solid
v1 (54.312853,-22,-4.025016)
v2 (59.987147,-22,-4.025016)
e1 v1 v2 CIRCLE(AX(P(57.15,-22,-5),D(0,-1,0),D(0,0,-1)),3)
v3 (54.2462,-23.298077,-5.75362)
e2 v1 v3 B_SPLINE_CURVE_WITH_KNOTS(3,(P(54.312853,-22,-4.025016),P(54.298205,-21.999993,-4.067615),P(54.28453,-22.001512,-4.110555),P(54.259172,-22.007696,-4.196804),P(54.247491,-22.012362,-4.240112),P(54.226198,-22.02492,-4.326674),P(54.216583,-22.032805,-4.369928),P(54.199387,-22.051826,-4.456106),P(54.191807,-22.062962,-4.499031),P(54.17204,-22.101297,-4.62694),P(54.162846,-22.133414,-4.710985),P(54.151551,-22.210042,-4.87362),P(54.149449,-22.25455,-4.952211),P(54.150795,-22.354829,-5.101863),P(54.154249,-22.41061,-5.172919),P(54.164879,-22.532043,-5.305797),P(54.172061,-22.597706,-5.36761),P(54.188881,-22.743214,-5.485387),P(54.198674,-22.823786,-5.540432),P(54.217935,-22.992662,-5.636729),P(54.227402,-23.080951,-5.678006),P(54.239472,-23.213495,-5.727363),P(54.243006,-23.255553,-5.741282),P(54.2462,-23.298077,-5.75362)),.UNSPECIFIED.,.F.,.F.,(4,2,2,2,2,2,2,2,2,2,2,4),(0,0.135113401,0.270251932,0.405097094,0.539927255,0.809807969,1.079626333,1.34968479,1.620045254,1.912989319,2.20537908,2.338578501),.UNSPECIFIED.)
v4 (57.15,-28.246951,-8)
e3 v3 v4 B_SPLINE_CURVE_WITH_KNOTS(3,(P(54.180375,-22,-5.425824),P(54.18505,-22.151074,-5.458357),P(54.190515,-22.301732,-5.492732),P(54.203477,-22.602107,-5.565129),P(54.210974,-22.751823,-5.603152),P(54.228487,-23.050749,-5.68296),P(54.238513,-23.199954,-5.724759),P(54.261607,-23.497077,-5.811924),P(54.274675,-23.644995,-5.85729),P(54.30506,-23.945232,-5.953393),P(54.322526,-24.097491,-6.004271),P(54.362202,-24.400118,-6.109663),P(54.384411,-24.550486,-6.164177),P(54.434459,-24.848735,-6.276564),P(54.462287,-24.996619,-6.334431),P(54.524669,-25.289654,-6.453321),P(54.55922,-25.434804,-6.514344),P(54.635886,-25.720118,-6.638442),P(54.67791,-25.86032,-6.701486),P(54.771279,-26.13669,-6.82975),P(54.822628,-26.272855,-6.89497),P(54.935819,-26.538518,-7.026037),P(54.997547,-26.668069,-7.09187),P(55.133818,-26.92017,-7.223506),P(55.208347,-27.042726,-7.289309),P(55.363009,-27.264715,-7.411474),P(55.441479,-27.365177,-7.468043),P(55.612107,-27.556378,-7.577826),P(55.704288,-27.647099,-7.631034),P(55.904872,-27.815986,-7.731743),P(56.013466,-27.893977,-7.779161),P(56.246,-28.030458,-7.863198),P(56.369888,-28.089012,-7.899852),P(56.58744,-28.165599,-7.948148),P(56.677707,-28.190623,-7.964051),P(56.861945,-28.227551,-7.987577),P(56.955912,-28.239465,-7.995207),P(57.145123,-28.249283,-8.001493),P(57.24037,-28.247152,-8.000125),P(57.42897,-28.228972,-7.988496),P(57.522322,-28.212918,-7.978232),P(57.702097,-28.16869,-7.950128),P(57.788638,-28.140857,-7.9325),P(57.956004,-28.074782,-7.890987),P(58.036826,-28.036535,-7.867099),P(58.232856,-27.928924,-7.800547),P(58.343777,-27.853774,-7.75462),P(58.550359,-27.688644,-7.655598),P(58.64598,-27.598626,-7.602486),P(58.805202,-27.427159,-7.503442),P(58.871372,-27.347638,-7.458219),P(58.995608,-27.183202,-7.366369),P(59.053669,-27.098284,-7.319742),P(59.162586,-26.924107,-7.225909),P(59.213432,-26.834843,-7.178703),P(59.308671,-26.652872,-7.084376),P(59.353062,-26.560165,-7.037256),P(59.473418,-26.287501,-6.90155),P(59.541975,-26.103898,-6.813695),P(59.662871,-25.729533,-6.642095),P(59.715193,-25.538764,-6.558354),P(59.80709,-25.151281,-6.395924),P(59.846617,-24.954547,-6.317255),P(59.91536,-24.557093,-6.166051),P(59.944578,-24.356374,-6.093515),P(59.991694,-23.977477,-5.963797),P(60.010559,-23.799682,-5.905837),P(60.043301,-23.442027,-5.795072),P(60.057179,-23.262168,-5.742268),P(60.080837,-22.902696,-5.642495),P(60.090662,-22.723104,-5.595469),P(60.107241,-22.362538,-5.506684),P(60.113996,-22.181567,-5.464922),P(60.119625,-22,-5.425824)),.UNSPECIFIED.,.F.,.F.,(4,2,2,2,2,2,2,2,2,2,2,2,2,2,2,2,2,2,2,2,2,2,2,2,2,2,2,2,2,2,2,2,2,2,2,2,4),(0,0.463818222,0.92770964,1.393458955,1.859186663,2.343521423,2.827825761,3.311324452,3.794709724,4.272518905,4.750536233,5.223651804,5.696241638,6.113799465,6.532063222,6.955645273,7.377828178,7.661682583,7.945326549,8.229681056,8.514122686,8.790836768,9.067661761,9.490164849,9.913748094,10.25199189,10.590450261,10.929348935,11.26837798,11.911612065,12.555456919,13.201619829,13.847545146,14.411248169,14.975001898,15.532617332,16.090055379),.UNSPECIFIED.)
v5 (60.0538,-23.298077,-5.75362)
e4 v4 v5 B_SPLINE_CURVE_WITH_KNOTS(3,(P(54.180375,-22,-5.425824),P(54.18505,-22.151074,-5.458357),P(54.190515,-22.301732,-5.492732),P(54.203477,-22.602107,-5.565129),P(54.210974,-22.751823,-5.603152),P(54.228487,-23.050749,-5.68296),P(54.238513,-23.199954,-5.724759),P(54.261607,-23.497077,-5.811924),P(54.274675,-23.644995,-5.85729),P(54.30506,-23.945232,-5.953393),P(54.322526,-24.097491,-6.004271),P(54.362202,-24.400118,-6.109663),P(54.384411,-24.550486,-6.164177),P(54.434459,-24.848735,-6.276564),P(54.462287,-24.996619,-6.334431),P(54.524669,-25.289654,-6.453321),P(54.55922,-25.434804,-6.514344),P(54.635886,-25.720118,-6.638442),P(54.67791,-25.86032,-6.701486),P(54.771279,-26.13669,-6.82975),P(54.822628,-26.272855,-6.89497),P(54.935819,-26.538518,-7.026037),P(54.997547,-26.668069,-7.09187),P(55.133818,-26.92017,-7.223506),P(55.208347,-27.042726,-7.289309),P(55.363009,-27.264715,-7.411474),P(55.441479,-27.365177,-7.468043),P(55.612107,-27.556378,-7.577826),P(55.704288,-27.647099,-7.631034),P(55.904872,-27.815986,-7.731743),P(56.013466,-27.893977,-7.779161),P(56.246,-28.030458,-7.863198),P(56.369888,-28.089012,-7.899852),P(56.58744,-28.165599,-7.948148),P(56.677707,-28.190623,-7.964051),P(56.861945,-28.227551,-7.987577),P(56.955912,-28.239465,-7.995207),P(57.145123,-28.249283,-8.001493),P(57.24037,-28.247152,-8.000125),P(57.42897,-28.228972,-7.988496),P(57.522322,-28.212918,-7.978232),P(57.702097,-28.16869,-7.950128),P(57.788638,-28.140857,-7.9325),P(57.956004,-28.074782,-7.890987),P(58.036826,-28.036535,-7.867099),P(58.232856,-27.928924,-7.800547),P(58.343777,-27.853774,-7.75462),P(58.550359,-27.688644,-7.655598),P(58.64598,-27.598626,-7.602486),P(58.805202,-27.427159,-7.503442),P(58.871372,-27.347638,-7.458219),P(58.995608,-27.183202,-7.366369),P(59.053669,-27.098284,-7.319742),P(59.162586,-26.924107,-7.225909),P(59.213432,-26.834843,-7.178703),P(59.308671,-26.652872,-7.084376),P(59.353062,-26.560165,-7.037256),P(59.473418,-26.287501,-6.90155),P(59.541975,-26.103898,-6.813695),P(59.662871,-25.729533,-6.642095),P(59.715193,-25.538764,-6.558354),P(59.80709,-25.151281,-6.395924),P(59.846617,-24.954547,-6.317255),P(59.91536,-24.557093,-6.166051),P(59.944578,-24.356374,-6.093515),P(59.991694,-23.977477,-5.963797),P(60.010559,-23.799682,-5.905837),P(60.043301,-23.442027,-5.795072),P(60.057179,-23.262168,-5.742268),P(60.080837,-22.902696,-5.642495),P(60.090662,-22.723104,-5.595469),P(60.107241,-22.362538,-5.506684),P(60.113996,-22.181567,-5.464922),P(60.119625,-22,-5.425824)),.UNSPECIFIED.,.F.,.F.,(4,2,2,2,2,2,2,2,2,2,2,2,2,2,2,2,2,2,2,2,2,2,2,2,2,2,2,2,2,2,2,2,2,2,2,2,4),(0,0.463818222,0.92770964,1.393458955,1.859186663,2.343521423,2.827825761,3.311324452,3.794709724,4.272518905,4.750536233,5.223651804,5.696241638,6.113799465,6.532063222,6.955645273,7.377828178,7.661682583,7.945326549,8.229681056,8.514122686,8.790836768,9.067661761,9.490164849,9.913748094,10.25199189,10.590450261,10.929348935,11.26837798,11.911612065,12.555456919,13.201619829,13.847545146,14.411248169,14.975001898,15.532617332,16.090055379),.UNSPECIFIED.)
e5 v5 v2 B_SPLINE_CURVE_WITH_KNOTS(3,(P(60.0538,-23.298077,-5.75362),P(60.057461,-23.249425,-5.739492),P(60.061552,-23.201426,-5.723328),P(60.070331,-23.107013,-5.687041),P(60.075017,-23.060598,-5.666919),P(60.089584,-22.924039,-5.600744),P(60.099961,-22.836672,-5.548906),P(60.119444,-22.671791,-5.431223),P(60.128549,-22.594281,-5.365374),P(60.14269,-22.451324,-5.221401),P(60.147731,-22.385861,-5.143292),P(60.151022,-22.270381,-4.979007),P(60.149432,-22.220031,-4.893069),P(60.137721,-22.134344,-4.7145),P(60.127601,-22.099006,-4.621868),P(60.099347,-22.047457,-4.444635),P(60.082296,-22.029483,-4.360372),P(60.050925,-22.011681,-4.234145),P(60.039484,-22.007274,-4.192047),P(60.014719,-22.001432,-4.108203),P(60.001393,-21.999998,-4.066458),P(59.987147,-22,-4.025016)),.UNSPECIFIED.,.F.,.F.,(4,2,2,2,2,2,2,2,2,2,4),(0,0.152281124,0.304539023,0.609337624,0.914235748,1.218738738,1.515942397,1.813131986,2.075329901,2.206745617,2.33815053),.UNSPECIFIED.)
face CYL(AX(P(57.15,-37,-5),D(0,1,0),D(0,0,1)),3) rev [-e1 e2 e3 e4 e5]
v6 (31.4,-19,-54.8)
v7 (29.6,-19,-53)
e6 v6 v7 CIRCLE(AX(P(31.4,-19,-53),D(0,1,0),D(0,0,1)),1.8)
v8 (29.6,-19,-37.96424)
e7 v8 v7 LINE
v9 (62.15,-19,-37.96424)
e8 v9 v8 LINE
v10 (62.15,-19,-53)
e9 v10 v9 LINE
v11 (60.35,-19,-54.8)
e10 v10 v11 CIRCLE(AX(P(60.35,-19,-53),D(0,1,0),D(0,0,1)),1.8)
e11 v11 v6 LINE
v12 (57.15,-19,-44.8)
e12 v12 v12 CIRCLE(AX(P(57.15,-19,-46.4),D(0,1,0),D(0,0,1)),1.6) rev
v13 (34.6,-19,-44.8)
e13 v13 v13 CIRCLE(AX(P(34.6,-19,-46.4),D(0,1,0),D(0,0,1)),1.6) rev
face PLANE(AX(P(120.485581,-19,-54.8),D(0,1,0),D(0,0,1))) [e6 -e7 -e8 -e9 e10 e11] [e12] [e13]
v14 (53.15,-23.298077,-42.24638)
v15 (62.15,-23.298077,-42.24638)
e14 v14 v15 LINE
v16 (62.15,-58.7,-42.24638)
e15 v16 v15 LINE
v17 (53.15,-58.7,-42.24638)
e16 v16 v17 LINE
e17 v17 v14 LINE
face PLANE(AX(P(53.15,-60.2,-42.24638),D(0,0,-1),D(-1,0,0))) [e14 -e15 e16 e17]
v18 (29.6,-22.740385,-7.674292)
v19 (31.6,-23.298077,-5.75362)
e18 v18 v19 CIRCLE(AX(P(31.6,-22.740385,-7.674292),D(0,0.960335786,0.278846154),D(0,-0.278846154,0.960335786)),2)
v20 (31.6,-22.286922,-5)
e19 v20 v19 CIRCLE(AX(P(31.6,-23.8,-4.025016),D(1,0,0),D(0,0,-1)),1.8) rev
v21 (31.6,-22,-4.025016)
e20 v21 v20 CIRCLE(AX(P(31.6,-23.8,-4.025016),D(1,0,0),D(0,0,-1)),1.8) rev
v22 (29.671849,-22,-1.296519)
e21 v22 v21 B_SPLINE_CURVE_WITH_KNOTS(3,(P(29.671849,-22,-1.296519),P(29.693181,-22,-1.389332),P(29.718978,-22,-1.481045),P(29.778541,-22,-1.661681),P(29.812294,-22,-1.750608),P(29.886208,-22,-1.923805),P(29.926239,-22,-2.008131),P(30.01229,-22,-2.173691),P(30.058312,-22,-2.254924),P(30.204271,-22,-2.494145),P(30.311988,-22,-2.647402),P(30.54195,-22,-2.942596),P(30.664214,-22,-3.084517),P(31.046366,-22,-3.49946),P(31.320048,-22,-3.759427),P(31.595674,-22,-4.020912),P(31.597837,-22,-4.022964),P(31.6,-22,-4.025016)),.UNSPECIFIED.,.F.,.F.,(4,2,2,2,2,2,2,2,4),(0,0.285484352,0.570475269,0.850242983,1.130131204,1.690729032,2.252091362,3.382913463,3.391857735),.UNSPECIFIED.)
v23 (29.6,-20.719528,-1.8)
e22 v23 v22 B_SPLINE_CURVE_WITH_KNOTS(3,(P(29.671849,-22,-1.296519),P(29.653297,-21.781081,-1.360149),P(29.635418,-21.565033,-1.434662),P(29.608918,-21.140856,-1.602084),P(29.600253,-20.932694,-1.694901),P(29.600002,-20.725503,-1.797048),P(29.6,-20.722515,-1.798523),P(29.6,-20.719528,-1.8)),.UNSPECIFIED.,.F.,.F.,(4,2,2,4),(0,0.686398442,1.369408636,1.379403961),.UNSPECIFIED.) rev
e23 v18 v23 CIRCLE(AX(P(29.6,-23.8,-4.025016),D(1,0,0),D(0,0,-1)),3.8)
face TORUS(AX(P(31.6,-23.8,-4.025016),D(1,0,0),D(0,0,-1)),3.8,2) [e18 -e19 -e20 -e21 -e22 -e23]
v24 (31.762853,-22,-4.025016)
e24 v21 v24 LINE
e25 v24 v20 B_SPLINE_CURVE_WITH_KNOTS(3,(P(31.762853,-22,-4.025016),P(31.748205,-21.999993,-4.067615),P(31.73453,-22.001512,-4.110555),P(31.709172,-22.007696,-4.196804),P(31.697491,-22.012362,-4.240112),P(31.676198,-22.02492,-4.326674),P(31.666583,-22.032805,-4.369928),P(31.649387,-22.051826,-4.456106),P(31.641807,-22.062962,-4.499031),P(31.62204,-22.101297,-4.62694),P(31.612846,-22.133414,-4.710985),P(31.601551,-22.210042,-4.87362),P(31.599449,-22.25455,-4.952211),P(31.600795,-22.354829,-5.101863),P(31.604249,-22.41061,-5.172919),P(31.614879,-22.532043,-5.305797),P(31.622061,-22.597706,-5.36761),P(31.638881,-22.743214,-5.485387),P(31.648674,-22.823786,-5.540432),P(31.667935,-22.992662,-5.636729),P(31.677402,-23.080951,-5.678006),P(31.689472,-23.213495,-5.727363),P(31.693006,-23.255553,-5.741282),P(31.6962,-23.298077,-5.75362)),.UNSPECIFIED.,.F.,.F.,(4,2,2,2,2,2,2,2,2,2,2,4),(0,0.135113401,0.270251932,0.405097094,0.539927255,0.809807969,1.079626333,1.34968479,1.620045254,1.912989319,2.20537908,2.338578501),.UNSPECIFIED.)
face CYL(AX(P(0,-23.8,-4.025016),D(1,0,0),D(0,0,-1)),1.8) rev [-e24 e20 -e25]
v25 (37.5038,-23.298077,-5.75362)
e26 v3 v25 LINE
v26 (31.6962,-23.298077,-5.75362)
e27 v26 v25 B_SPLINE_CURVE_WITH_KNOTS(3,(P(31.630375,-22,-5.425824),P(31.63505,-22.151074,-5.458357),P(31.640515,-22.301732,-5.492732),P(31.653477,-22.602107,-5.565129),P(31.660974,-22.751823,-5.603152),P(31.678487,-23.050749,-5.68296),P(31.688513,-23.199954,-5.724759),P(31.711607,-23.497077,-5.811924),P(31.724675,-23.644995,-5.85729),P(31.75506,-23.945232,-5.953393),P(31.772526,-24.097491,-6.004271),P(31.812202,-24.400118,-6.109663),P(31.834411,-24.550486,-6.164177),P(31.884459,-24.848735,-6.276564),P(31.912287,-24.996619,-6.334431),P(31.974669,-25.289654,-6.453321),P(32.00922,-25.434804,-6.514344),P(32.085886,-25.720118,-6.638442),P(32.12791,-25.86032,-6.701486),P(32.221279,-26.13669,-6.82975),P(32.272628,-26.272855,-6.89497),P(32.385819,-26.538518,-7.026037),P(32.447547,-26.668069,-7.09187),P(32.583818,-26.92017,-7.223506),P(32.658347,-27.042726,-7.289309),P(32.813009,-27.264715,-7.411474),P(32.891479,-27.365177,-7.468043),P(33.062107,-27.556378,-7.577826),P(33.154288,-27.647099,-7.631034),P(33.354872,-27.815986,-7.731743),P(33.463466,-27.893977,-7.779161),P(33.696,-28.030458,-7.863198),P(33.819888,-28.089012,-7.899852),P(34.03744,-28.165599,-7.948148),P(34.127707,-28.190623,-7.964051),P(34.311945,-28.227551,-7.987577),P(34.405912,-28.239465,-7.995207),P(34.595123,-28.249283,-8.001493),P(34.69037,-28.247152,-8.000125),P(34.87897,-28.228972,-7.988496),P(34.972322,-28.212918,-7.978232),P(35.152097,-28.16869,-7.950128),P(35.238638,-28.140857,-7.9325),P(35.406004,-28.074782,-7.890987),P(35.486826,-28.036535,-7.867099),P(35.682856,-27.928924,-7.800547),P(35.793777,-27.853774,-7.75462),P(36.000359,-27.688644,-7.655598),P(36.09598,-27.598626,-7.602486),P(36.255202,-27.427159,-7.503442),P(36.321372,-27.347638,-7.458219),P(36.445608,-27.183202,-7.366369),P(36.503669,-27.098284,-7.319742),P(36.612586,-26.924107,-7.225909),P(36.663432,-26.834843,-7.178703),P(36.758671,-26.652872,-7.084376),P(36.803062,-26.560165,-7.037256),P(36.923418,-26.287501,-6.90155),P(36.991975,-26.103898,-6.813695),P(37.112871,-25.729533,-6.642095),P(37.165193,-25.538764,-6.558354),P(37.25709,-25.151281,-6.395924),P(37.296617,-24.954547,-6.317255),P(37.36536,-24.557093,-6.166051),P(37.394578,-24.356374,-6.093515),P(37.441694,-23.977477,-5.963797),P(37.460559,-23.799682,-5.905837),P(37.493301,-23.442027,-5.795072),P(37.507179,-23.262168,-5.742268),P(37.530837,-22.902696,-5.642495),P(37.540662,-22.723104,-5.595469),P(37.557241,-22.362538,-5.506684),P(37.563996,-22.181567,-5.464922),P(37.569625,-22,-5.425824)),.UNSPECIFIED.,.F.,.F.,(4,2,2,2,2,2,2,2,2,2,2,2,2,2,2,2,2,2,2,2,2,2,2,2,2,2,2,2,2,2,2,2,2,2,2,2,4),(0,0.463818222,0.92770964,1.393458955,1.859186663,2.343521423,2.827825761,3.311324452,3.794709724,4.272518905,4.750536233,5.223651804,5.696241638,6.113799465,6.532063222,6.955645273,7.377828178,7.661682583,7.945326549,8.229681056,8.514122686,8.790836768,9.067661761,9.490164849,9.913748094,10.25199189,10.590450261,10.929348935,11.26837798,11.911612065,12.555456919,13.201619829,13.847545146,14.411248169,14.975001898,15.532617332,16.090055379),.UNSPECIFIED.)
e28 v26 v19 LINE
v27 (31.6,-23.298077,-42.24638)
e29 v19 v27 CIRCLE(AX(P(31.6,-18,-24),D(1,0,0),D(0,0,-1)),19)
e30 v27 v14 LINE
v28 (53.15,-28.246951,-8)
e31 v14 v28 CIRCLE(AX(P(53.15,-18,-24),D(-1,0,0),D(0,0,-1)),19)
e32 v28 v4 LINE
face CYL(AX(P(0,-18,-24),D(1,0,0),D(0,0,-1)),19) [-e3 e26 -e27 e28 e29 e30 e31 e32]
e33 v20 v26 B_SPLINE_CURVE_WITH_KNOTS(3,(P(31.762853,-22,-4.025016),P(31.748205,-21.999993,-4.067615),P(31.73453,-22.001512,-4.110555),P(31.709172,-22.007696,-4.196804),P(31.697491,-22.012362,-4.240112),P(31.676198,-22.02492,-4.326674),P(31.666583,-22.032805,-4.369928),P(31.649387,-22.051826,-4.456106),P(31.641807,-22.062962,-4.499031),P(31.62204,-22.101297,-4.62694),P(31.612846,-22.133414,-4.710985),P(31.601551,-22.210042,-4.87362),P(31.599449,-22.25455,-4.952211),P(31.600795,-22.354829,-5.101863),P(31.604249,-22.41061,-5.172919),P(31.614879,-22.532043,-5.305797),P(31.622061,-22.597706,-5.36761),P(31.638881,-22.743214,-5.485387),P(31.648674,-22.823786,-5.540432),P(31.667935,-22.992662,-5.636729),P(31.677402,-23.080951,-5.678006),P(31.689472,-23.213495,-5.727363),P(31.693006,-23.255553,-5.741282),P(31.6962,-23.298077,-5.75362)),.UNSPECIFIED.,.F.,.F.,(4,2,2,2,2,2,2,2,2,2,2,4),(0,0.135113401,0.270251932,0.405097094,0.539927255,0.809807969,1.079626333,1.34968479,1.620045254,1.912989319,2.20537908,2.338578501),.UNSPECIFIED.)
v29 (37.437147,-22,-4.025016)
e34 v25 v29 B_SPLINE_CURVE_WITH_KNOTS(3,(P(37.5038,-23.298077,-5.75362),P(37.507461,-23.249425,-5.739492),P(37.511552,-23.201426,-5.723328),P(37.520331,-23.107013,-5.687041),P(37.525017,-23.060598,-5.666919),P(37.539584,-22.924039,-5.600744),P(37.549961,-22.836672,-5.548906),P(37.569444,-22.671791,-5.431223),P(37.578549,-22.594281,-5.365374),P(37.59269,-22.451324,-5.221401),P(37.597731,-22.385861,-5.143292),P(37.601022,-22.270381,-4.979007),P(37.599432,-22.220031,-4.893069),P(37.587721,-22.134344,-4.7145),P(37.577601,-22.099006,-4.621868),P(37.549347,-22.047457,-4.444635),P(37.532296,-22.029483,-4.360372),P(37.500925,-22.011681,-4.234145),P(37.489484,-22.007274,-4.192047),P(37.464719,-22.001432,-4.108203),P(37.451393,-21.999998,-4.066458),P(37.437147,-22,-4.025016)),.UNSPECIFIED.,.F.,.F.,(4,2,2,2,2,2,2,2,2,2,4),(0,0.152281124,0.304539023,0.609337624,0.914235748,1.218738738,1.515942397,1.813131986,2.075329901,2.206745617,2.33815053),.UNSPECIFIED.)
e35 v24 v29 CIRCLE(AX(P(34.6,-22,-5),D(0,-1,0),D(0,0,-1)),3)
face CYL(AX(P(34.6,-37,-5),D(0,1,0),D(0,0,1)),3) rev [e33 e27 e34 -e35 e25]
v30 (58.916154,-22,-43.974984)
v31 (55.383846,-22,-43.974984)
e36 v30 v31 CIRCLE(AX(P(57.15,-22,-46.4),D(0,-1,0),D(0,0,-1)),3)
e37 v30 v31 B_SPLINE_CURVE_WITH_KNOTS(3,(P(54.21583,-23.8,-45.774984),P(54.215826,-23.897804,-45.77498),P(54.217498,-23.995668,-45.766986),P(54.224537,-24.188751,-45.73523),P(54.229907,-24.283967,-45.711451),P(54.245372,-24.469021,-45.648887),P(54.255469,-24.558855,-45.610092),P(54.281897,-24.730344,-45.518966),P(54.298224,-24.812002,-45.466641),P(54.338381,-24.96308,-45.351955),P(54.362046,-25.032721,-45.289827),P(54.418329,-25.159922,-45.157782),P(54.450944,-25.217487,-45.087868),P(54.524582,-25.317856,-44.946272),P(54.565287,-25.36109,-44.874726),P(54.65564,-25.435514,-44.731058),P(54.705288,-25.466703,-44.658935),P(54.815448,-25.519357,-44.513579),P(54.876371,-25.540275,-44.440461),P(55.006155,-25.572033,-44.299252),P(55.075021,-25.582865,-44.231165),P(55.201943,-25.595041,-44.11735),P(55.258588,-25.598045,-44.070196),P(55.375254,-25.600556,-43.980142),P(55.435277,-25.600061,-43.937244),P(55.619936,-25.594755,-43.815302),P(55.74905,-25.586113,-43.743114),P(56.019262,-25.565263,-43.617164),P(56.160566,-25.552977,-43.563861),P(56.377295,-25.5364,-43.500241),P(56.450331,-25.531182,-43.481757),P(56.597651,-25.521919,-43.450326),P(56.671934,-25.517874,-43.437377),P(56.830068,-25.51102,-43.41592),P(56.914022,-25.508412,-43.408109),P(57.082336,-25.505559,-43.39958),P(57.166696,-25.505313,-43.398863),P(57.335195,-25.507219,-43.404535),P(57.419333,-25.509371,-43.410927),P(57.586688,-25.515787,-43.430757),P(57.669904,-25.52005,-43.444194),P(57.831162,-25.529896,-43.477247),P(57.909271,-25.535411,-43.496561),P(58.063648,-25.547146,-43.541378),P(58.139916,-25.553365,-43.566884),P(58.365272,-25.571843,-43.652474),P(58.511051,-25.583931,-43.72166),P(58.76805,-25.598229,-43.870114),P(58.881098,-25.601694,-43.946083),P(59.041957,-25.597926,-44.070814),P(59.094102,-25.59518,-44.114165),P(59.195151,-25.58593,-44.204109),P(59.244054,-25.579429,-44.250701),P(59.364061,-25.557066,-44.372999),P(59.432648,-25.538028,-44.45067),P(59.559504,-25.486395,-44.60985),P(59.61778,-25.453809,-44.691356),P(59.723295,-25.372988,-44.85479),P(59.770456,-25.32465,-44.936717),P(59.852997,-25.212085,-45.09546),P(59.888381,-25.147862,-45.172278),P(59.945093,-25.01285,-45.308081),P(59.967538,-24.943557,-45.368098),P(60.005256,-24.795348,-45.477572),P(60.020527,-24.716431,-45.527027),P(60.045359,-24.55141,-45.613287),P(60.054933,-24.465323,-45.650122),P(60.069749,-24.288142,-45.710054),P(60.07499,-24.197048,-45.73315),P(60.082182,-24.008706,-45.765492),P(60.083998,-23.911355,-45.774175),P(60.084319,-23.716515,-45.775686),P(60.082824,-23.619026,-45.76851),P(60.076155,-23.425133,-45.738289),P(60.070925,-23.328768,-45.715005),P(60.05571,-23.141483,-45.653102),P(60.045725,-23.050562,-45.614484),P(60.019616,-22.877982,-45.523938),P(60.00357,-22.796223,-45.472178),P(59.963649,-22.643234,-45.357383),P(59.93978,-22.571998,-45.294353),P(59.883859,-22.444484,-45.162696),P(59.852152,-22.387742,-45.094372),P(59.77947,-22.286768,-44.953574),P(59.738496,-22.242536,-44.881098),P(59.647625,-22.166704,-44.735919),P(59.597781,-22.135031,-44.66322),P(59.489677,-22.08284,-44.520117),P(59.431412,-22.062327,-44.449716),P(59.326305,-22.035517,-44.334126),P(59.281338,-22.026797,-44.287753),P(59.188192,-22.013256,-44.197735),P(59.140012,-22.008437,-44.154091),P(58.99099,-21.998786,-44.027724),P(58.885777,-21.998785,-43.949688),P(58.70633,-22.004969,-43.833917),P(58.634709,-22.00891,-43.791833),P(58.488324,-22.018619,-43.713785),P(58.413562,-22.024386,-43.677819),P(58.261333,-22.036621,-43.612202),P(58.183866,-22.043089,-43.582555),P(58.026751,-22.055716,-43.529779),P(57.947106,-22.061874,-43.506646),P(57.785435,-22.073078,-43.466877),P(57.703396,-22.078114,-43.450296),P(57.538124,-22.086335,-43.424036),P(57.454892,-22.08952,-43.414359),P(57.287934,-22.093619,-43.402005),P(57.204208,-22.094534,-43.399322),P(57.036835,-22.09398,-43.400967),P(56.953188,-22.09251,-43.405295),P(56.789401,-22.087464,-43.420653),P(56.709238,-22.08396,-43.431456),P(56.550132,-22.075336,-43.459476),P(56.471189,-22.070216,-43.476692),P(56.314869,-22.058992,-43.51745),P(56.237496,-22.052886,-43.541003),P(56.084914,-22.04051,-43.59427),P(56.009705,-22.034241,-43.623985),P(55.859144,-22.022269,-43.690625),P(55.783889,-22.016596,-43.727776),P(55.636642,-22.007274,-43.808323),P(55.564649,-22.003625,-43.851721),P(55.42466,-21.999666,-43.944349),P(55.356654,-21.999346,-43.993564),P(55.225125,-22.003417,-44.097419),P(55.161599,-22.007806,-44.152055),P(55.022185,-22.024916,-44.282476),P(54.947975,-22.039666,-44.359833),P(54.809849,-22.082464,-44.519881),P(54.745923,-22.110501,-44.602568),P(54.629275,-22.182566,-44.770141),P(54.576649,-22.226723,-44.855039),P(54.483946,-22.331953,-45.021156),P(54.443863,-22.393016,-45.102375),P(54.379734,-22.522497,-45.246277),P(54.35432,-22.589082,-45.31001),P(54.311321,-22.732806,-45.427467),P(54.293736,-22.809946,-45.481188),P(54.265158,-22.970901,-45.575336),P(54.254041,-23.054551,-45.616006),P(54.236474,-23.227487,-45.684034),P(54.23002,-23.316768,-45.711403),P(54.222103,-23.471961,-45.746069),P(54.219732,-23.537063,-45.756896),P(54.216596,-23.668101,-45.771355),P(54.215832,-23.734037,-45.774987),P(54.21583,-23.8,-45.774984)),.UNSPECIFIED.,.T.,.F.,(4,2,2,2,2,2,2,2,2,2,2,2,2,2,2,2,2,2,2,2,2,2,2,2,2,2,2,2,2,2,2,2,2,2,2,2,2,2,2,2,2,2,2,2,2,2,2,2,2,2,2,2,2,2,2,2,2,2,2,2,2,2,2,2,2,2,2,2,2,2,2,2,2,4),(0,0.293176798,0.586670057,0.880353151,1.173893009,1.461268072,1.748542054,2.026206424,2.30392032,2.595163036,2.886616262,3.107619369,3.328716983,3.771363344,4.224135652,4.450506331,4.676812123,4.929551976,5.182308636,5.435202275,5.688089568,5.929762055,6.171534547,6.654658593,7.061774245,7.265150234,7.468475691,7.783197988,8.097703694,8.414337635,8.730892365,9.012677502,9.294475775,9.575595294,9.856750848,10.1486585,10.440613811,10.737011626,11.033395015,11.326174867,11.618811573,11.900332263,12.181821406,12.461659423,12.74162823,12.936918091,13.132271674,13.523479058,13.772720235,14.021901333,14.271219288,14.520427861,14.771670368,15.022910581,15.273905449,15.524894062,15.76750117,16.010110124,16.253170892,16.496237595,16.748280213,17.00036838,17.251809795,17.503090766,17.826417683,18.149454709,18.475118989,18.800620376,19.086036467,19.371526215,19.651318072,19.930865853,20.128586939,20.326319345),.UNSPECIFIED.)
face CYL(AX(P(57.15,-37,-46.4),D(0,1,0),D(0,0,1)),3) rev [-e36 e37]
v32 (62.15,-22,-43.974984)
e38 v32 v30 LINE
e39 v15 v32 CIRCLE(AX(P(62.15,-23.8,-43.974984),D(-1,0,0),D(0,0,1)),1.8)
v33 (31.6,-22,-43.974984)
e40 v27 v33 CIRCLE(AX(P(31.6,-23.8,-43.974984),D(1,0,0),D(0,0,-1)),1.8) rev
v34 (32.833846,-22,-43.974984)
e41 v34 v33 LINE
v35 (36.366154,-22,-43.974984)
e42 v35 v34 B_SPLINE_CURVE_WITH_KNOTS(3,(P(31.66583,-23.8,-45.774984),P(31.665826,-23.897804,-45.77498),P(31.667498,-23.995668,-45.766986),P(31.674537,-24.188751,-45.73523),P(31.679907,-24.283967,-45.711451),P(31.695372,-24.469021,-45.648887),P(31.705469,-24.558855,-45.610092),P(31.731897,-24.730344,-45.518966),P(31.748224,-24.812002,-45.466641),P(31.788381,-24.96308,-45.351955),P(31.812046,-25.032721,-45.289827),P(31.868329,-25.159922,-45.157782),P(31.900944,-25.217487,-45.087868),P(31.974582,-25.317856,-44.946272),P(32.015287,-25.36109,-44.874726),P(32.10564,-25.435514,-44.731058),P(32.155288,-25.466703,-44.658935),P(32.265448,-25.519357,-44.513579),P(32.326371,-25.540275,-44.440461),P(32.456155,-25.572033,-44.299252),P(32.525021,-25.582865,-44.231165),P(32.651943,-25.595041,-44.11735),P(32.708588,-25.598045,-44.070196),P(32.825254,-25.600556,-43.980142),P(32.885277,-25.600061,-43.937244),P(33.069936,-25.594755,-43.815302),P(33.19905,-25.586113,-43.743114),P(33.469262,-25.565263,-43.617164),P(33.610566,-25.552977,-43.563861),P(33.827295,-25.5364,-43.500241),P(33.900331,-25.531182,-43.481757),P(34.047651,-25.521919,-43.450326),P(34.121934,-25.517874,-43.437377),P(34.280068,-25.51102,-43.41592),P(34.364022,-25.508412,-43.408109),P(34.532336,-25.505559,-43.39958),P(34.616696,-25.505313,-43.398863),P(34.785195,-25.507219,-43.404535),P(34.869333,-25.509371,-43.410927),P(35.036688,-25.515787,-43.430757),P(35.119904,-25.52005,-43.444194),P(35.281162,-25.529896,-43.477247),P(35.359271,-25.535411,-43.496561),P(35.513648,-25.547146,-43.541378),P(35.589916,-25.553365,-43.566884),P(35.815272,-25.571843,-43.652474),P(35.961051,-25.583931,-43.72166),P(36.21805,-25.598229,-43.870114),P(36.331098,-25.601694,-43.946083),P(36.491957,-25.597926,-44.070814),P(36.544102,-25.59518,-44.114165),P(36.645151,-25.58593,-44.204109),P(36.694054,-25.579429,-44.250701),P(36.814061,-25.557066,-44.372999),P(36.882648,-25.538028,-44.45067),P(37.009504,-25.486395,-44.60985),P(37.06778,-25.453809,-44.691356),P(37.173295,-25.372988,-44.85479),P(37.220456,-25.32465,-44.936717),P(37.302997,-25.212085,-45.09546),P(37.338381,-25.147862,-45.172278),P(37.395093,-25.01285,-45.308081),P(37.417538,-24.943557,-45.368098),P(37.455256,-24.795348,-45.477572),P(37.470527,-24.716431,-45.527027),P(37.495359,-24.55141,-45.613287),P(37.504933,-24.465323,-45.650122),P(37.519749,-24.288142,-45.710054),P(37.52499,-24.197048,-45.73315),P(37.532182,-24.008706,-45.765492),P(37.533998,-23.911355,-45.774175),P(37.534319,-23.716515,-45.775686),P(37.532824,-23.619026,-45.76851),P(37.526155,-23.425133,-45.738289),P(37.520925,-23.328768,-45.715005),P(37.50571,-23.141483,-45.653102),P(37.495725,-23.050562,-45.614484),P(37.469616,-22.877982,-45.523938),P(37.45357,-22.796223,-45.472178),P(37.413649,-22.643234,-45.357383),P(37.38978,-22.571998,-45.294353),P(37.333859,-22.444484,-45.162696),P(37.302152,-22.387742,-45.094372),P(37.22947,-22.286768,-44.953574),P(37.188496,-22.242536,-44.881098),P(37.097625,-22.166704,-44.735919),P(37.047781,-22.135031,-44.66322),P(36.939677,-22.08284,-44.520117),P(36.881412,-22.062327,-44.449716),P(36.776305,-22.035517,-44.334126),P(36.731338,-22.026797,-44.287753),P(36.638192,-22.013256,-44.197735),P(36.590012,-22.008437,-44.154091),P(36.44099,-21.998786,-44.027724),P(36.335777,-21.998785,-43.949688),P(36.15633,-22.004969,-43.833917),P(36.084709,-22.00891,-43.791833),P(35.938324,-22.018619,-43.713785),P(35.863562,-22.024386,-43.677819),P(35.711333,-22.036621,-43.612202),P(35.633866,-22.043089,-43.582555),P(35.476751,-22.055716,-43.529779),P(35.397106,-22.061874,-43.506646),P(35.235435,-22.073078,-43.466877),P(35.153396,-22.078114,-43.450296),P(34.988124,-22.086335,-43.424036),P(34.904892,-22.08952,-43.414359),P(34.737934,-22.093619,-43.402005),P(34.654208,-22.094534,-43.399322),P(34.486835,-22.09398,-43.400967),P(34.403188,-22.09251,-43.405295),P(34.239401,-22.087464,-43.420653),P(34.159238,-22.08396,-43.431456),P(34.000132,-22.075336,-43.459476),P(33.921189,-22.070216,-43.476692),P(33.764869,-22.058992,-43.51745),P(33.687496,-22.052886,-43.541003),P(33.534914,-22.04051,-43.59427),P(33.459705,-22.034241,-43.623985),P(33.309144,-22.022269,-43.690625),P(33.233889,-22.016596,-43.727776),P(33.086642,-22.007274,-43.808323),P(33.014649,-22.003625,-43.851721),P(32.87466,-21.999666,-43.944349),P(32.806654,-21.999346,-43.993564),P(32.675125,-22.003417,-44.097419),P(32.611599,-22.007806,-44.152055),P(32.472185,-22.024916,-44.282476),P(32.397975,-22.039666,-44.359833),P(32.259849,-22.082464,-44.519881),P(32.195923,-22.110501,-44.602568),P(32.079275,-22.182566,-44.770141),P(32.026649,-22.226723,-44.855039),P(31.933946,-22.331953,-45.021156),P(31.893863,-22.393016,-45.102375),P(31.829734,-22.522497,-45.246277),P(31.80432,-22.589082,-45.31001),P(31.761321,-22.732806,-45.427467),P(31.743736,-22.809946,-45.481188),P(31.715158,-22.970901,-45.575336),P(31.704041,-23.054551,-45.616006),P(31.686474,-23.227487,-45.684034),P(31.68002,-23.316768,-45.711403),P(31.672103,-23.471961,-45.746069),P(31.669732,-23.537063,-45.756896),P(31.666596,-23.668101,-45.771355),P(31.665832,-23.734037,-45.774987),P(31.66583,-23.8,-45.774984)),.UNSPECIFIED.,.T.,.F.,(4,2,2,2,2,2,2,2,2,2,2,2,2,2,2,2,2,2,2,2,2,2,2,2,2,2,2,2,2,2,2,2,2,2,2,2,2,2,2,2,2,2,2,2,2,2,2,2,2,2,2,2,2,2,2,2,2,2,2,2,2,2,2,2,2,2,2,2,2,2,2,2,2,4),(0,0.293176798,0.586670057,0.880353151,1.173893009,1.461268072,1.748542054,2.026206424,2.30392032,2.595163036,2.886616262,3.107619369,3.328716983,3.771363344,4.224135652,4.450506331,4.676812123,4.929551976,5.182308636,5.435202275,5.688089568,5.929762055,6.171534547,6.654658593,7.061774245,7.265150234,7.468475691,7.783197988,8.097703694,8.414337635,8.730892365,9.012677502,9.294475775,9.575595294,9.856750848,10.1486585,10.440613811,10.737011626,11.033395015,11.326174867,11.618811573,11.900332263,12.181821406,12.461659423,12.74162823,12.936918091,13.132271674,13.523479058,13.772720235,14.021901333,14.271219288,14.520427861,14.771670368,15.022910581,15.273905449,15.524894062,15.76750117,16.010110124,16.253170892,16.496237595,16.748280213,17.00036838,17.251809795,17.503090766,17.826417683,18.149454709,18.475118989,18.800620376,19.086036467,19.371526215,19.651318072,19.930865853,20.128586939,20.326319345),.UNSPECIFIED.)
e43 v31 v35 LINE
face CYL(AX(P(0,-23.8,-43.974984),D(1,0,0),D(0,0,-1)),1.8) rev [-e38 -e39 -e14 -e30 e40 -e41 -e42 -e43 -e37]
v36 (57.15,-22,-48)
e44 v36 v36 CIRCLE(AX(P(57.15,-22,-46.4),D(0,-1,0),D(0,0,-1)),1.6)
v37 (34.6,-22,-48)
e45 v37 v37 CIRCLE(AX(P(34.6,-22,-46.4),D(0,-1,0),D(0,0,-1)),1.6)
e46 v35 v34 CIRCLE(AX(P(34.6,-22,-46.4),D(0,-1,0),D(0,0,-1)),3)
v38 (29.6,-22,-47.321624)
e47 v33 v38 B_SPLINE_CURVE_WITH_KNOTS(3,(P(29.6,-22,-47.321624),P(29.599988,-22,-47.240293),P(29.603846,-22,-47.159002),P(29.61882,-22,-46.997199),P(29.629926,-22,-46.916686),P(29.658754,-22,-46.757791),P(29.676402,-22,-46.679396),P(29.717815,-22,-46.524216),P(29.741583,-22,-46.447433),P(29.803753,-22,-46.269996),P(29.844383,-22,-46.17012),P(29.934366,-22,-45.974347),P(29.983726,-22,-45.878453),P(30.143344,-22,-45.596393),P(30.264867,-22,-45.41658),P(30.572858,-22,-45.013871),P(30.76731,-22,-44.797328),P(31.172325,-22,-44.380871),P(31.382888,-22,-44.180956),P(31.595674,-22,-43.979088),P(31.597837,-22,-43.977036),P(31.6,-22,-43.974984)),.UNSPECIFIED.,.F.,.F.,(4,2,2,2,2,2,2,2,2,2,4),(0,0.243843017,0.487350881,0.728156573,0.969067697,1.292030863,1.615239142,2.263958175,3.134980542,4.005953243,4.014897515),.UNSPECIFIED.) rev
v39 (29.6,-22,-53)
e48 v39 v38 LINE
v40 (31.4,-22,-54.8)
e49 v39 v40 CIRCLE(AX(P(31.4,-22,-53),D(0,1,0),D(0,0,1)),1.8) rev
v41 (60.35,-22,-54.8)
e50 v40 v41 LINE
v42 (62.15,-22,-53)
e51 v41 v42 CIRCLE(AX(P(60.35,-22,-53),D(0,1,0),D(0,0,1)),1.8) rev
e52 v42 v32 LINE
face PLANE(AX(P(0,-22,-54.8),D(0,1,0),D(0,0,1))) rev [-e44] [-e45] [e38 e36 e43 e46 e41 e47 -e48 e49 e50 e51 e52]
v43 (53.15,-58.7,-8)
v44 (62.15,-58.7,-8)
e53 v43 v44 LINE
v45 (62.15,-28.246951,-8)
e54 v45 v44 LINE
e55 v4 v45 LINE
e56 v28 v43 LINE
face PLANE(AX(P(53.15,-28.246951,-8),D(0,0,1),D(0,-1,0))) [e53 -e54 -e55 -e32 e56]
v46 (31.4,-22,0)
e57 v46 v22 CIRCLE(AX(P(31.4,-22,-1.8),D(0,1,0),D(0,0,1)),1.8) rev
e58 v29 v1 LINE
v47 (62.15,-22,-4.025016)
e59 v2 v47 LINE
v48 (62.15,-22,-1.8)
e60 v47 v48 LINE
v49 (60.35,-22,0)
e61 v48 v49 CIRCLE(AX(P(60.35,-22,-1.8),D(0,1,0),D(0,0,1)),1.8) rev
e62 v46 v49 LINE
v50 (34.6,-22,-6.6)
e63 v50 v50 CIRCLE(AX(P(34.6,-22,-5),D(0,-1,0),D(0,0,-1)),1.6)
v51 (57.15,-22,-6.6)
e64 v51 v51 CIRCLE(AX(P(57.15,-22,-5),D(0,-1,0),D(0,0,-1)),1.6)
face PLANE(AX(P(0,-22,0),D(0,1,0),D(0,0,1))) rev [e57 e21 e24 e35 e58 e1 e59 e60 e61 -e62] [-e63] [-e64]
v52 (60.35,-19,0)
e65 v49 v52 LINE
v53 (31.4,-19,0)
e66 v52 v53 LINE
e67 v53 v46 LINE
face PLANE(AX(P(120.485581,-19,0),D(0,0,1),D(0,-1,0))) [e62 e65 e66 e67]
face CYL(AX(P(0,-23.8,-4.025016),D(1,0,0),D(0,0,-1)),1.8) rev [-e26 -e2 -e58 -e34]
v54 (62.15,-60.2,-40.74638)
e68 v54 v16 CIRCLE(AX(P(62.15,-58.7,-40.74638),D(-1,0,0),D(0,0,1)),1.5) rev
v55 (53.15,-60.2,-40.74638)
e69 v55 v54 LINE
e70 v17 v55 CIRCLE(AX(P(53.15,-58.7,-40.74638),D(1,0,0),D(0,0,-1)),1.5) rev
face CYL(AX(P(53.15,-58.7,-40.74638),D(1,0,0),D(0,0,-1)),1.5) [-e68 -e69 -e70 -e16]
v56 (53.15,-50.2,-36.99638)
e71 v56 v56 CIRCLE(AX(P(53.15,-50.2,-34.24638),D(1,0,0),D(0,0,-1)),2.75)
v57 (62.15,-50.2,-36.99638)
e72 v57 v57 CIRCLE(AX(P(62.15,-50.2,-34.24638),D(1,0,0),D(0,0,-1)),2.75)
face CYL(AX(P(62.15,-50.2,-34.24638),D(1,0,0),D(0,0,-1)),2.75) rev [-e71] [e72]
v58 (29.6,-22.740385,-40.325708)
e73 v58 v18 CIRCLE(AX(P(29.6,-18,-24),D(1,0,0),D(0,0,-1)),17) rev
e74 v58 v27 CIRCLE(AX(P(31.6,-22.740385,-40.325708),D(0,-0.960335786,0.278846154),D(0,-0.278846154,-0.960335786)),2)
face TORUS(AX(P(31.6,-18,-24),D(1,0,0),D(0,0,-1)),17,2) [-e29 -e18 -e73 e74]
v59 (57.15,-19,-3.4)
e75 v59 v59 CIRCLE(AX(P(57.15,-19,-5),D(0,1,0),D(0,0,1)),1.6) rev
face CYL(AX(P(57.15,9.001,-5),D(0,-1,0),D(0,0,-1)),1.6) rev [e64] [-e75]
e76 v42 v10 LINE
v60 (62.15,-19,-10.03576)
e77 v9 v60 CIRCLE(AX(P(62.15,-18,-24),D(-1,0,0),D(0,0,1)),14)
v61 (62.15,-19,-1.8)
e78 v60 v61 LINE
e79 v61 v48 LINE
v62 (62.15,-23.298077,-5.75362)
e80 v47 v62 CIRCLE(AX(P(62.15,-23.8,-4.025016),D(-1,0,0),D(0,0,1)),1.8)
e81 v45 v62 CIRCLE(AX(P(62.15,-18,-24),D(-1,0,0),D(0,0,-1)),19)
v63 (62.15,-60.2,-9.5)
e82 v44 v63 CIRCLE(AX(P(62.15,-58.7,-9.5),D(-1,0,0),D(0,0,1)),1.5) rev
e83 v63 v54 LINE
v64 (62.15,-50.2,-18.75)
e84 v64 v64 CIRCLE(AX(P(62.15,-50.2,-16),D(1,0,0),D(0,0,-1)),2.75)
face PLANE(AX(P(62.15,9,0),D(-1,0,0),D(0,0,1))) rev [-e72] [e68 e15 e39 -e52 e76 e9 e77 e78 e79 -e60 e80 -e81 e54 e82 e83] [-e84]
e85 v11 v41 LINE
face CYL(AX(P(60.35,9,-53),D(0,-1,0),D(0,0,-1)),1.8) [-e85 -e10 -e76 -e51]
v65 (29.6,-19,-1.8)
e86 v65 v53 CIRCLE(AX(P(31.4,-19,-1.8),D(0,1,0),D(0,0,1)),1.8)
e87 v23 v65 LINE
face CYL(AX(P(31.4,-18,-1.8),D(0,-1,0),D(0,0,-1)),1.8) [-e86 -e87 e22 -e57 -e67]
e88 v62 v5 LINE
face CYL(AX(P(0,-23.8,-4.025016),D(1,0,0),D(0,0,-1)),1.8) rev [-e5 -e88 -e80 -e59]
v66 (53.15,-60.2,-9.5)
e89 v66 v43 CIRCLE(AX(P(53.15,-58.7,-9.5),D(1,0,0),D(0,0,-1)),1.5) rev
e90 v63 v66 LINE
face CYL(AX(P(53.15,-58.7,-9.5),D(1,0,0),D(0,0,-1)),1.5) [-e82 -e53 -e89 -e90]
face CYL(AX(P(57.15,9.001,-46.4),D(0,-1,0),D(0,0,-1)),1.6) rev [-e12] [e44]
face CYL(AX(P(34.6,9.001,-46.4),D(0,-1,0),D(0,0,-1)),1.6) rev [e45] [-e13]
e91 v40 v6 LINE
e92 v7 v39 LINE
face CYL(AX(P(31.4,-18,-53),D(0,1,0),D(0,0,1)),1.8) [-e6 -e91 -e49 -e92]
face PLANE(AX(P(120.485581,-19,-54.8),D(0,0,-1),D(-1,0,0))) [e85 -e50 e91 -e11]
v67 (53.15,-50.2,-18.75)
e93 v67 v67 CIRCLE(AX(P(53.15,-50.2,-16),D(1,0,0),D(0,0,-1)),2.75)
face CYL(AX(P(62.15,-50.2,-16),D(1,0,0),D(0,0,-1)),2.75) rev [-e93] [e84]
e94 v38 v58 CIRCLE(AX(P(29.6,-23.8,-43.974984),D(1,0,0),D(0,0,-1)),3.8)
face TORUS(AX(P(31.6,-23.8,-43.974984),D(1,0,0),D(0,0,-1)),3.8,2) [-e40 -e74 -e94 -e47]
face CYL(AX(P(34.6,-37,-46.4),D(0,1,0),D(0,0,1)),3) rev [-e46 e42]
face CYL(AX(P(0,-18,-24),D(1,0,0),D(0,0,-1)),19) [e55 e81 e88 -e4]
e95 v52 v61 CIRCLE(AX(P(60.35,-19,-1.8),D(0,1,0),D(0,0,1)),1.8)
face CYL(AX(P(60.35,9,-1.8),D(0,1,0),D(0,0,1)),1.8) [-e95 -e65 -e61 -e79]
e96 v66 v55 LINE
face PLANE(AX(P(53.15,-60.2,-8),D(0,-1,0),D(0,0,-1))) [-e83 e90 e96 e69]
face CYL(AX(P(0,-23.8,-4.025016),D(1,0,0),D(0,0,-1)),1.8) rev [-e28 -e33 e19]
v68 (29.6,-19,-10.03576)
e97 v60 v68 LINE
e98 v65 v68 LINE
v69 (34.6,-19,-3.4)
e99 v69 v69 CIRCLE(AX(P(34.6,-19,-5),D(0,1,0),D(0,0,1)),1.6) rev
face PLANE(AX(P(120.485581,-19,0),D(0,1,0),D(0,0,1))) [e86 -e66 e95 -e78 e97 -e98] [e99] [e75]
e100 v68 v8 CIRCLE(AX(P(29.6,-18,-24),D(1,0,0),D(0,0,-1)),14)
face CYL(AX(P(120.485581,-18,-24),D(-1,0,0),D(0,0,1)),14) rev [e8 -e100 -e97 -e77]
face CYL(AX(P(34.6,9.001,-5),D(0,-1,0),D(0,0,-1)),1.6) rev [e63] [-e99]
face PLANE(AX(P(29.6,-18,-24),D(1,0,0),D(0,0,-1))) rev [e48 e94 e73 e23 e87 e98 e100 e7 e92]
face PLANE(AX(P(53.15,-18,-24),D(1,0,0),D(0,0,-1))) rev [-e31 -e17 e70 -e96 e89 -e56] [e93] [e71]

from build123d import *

# Parameters (mm, degrees)
SKETCH1_W                       = 62.15
SKETCH1_H                       = 78
BOSS_EXTRUDE1_DEPTH             = 9
SPRING_PULLEY_CUTOUT_DEPTH      = 10
SPRING_PULLEY_CUTOUT_DEPTH_BACK = 11.2
SKETCH2_R                       = 25
SKETCH3_R                       = 1.225
CUT_EXTRUDE2_DEPTH              = 7.5
SKETCH4_R                       = 0.75
CUT_EXTRUDE3_DEPTH              = 101.014361469
CHAMFER1_SIZE                   = 0.4
CHAMFER1_SIZE2                  = 0.692820323
MOTOR_HOLDER_DEPTH              = 32.95
MOVE_FACE7_BY                   = 0.4
SKETCH20_R                      = 2.55
CUT_EXTRUDE8_DEPTH              = 7
BOSS_EXTRUDE5_DEPTH             = 32.55
MOVE_FACE3_BY                   = 1
CUT_EXTRUDE12_DEPTH             = 108.086985671
FILLET12_R                      = 1.8
SKETCH24_R                      = 1.6
MOTOR_CLIP_HOLES_DEPTH          = 3
SKETCH26_W                      = 5.75
SKETCH26_H                      = 12.7
CUT_EXTRUDE13_DEPTH             = 110.829970864
SKETCH27_R                      = 2
CUT_EXTRUDE14_DEPTH             = 7.25
SKETCH29_R                      = 0.8
CUT_EXTRUDE16_DEPTH             = 5
SKETCH52_W                      = 78
SKETCH52_H                      = 9
CUT_EXTRUDE31_DEPTH             = 7.25
MOVE_START                      = -54.4
MOVE_FACE6_OUTLINE_W            = 5.75
MOVE_FACE6_OUTLINE_H            = 9
MOVE_FACE6_DEPTH                = 13.1
SKETCH31_W                      = 2
SKETCH31_H                      = 4
SKETCH32_R                      = 3
CUT_EXTRUDE17_DEPTH             = 105.439563953
MOTOR_CLIP_WIRE_FILLET_R        = 2
BOSS_EXTRUDE8_DEPTH             = 9
FILLET13_R                      = 1.5
M5_CLEARANCE_HOLE1_D            = 5.5


# Read off the part's stored shape, not the designer's step: Move Face6
with BuildPart() as part:
    # Sketch1 → Boss-Extrude1 (new body)
    with BuildSketch(Plane(origin=(0, 0, 0), x_dir=(1, 0, 0), z_dir=(0, 1, 0))):
        with Locations((31.075, 39)):
            Rectangle(SKETCH1_W, SKETCH1_H)
    extrude(amount=BOSS_EXTRUDE1_DEPTH)

    # Sketch2 → spring_pulley_cutout (cut, two sides: drawn at the far end of the back side and taken through both)
    with BuildSketch(Plane.ZY.offset(-18).offset(-SPRING_PULLEY_CUTOUT_DEPTH_BACK)):
        with Locations((-24, -18)):
            Circle(SKETCH2_R)
    extrude(amount=SPRING_PULLEY_CUTOUT_DEPTH + SPRING_PULLEY_CUTOUT_DEPTH_BACK, mode=Mode.SUBTRACT)

    # Sketch3 → Cut-Extrude2 (cut)
    with BuildSketch(Plane(origin=(0, 9, 0), x_dir=(1, 0, 0), z_dir=(0, 1, 0))):
        with Locations(Location((12.85, 4, 0), (0, 0, 270))):
            Circle(SKETCH3_R)
        with Locations(Location((23.15, 44, 0), (0, 0, 270))):
            Circle(SKETCH3_R)
    extrude(amount=-CUT_EXTRUDE2_DEPTH, mode=Mode.SUBTRACT)

    # Sketch4 → Cut-Extrude3 (cut, through all)
    with BuildSketch(Plane(origin=(0, 1.5, 0), x_dir=(1, 0, 0), z_dir=(0, 1, 0))):
        with Locations(Location((12.85, 4, 0), (0, 0, 270))):
            Circle(SKETCH4_R)
        with Locations(Location((23.15, 44, 0), (0, 0, 270))):
            Circle(SKETCH4_R)
    extrude(amount=-CUT_EXTRUDE3_DEPTH, mode=Mode.SUBTRACT)

    # Chamfer1
    chamfer1_edges = [part.edges().sort_by_distance(p)[0] for p in [
        (12.85, 9, -5.225),
        (23.15, 9, -45.225),
    ]]
    chamfer1_side = [part.faces().sort_by_distance(p)[0] for p in [
        (31.100480241, 9, -39.029231634),
    ]]
    chamfer(chamfer1_edges, length=CHAMFER1_SIZE, length2=CHAMFER1_SIZE2, reference=chamfer1_side[0])

    # Sketch19 → Motor Holder (add)
    with BuildSketch(Plane.ZY.offset(-29.2)):
        with BuildLine():
            Line((-54.8, -18), (-38, -18))
            ThreePointArc((-38, -18), (-24, -4), (-10, -18))
            Line((-10, -18), (0, -18))
            Line((0, -18), (0, 0))
            Line((0, 0), (-54.8, 0))
            Line((-54.8, 0), (-54.8, -18))
        make_face()
    extrude(amount=-MOTOR_HOLDER_DEPTH)

    # Move Face7: a face moved inward by 0.4
    extrude(part.faces().sort_by_distance((29.2, 0.75, -27.4))[0], amount=MOVE_FACE7_BY, dir=(1, 0, 0), mode=Mode.SUBTRACT)

    # Sketch20 → Cut-Extrude8 (cut)
    with BuildSketch(Plane(origin=(0, -18, 0), x_dir=(-1, 0, 0), z_dir=(0, -1, 0))):
        with Locations(Location((-57.15, 5, 0), (0, 0, 90))):
            Circle(SKETCH20_R)
        with Locations(Location((-34.6, 5, 0), (0, 0, 90))):
            Circle(SKETCH20_R)
        with Locations(Location((-57.15, 46.4, 0), (0, 0, 90))):
            Circle(SKETCH20_R)
        with Locations(Location((-34.6, 46.4, 0), (0, 0, 90))):
            Circle(SKETCH20_R)
    extrude(amount=-CUT_EXTRUDE8_DEPTH, mode=Mode.SUBTRACT)

    # Move Face3: a face moved inward by 1.0
    extrude(part.faces().sort_by_distance((8, 2.836578696, -24))[0], amount=MOVE_FACE3_BY, dir=(-1, 0, 0), mode=Mode.SUBTRACT)

    # Sketch26 → Cut-Extrude13 (cut, through all)
    with BuildSketch(Plane(origin=(0, 9, 0), x_dir=(1, 0, 0), z_dir=(0, 1, 0))):
        with Locations((10.125, 47.85)):
            Rectangle(SKETCH26_W, SKETCH26_H)
    extrude(amount=-CUT_EXTRUDE13_DEPTH, mode=Mode.SUBTRACT)

    # Sketch27 → Cut-Extrude14 (cut)
    with BuildSketch(Plane.ZY):
        with Locations((-44.6, 5)):
            Circle(SKETCH27_R)
        with Locations((-51.1, 5)):
            Circle(SKETCH27_R)
    extrude(amount=-CUT_EXTRUDE14_DEPTH, mode=Mode.SUBTRACT)

    # Sketch29 → Cut-Extrude16 (cut)
    with BuildSketch(Plane.ZY.offset(-13)):
        with Locations((-51.1, 5)):
            Circle(SKETCH29_R)
        with Locations((-44.6, 5)):
            Circle(SKETCH29_R)
    extrude(amount=-CUT_EXTRUDE16_DEPTH, mode=Mode.SUBTRACT)

    # Sketch52 → Cut-Extrude31 (cut)
    with BuildSketch(Plane.ZY):
        with Locations((-39, 4.5)):
            Rectangle(SKETCH52_W, SKETCH52_H)
    extrude(amount=-CUT_EXTRUDE31_DEPTH, mode=Mode.SUBTRACT)

    # Move Face6 outline → Move Face6 (cut)
    with BuildSketch(Plane.XY.offset(MOVE_START)):
        with Locations((10.125, 4.5)):
            Rectangle(MOVE_FACE6_OUTLINE_W, MOVE_FACE6_OUTLINE_H)
    extrude(amount=MOVE_FACE6_DEPTH, mode=Mode.SUBTRACT)

    # Cut-Sweep1: sweep along a path in Sketch30
    with BuildLine(Plane(origin=(0, -12, 0), x_dir=(-1, 0, 0), z_dir=(0, -1, 0))) as cut_sweep1_path:
        CenterArc((-45.875, 0), 5, 0, 360)
    # Sketch31 → Cut-Sweep1 (sweep, cut)
    with BuildSketch(Plane(origin=(0, 0, 0), x_dir=(-1, 0, 0), z_dir=(0, 0, -1))):
        with Locations((-42.875, -12)):
            Rectangle(SKETCH31_W, SKETCH31_H)
    sweep(path=cut_sweep1_path.line, mode=Mode.SUBTRACT)


with BuildPart() as body_2:
    # Sketch22 → Boss-Extrude5 (new body)
    with BuildSketch(Plane.ZY.offset(-29.6)):
        with BuildLine():
            Line((0, -19), (-10.035759956, -19))
            ThreePointArc((-10.035759956, -19), (-24, -32), (-37.964240044, -19))
            Line((-37.964240044, -19), (-54.8, -19))
            Line((-54.8, -19), (-54.8, -39))
            Line((-54.8, -39), (0, -39))
            Line((0, -39), (0, -19))
        make_face()
    extrude(amount=-BOSS_EXTRUDE5_DEPTH)

    # Sketch25 → Cut-Extrude12 (cut, through all)
    with BuildSketch(Plane(origin=(62.15, 0, 0), x_dir=(0, 0, -1), z_dir=(1, 0, 0))):
        with BuildLine():
            Line((54.8, -22), (42.574175621, -22))
            ThreePointArc((42.574175621, -22), (24, -37), (5.425824379, -22))
            Line((5.425824379, -22), (0, -22))
            Line((0, -22), (0, -42))
            Line((0, -42), (54.8, -42))
            Line((54.8, -42), (54.8, -22))
        make_face()
    extrude(amount=-CUT_EXTRUDE12_DEPTH, mode=Mode.SUBTRACT)

    # Fillet12
    fillet12_edges = [body_2.edges().sort_by_distance(p)[0] for p in [
        (62.15, -20.5, 0),
        (62.15, -20.5, -54.8),
        (29.6, -20.5, 0),
        (45.875, -22, -5.425824379),
        (45.875, -22, -42.574175621),
        (29.6, -20.5, -54.8),
    ]]
    fillet(fillet12_edges, radius=FILLET12_R)

    # Sketch24 → Motor Clip Holes (cut)
    with BuildSketch(Plane.XZ.offset(22)):
        with Locations(Location((34.6, -5, 0), (0, 0, 37.543618534))):
            Circle(SKETCH24_R)
        with Locations(Location((57.15, -5, 0), (0, 0, 37.543618534))):
            Circle(SKETCH24_R)
        with Locations(Location((34.6, -46.4, 0), (0, 0, 270))):
            Circle(SKETCH24_R)
        with Locations(Location((57.15, -46.4, 0), (0, 0, 270))):
            Circle(SKETCH24_R)
    extrude(amount=-MOTOR_CLIP_HOLES_DEPTH, mode=Mode.SUBTRACT)

    # Sketch32 → Cut-Extrude17 (cut, through all)
    with BuildSketch(Plane.XZ.offset(22)):
        with Locations((57.15, -5)):
            Circle(SKETCH32_R)
        with Locations((57.15, -46.4)):
            Circle(SKETCH32_R)
        with Locations((34.6, -46.4)):
            Circle(SKETCH32_R)
        with Locations((34.6, -5)):
            Circle(SKETCH32_R)
    extrude(amount=CUT_EXTRUDE17_DEPTH, mode=Mode.SUBTRACT)

    # Motor Clip Wire Fillet
    # the kernel refuses this fillet: 2 mm, written as the material it takes off along each edge
    with BuildSketch(Plane(origin=(29.6, -18, -24), x_dir=(0, -0.27884615384615374, 0.9603357863191433), z_dir=(0, 0.9603357863191433, 0.27884615384615374))) as motor_clip_wire_fillet_piece_1:
        with BuildLine():
            CenterArc((19 - MOTOR_CLIP_WIRE_FILLET_R, MOTOR_CLIP_WIRE_FILLET_R), MOTOR_CLIP_WIRE_FILLET_R, 270, 90)
            Line((19 - MOTOR_CLIP_WIRE_FILLET_R, 0), (19, 0))
            Line((19, 0), (19, MOTOR_CLIP_WIRE_FILLET_R))
        make_face()
    revolve(axis=Axis((29.6, -18, -24), (1, 0, 0)), revolution_arc=147.617296723, mode=Mode.SUBTRACT)
    with BuildSketch(Plane(origin=(29.6, -23.8, -43.974984355), x_dir=(0, 0.2788461538461544, 0.960335786319143), z_dir=(0, -0.960335786319143, 0.2788461538461544))) as motor_clip_wire_fillet_piece_2:
        with BuildLine():
            CenterArc((1.8 + MOTOR_CLIP_WIRE_FILLET_R, -MOTOR_CLIP_WIRE_FILLET_R), MOTOR_CLIP_WIRE_FILLET_R, 90, 90)
            Line((1.8 + MOTOR_CLIP_WIRE_FILLET_R, 0), (1.8, 0))
            Line((1.8, 0), (1.8, -MOTOR_CLIP_WIRE_FILLET_R))
        make_face()
    revolve(axis=Axis((29.6, -23.8, -43.974984355), (-1, 0, 0)), revolution_arc=233.006586684, mode=Mode.SUBTRACT)
    with BuildSketch(Plane(origin=(29.6, -23.8, -4.025015645), x_dir=(0, -0.9348128979547861, 0.3551406000690075), z_dir=(0, -0.3551406000690075, -0.9348128979547861))) as motor_clip_wire_fillet_piece_3:
        with BuildLine():
            CenterArc((1.8 + MOTOR_CLIP_WIRE_FILLET_R, -MOTOR_CLIP_WIRE_FILLET_R), MOTOR_CLIP_WIRE_FILLET_R, 90, 90)
            Line((1.8 + MOTOR_CLIP_WIRE_FILLET_R, 0), (1.8, 0))
            Line((1.8, 0), (1.8, -MOTOR_CLIP_WIRE_FILLET_R))
        make_face()
    revolve(axis=Axis((29.6, -23.8, -4.025015645), (-1, 0, 0)), revolution_arc=233.006586684, mode=Mode.SUBTRACT)

    # Sketch64 → Boss-Extrude8 (add)
    with BuildSketch(Plane(origin=(62.15, 0, 0), x_dir=(0, 0, -1), z_dir=(1, 0, 0))):
        with BuildLine():
            Line((8, -28.246950766), (8, -60.2))
            Line((8, -60.2), (42.24637994, -60.2))
            Line((42.24637994, -60.2), (42.24637994, -23.298076923))
            ThreePointArc((42.24637994, -23.298076923), (26.717424109, -36.804669798), (8, -28.246950766))
        make_face()
    extrude(amount=-BOSS_EXTRUDE8_DEPTH)

    # Fillet13
    fillet13_edges = [body_2.edges().sort_by_distance(p)[0] for p in [
        (57.65, -60.2, -42.24637994),
        (57.65, -60.2, -8),
    ]]
    fillet(fillet13_edges, radius=FILLET13_R)

    # M5 Clearance Hole1 (through all)
    with Locations(Plane(origin=(62.15, 0, 0), x_dir=(0, 0, -1), z_dir=(1, 0, 0))):
        with Locations((16, -50.2), (34.24637994, -50.2)):
            Hole(M5_CLEARANCE_HOLE1_D / 2)


solid = body_2.part
